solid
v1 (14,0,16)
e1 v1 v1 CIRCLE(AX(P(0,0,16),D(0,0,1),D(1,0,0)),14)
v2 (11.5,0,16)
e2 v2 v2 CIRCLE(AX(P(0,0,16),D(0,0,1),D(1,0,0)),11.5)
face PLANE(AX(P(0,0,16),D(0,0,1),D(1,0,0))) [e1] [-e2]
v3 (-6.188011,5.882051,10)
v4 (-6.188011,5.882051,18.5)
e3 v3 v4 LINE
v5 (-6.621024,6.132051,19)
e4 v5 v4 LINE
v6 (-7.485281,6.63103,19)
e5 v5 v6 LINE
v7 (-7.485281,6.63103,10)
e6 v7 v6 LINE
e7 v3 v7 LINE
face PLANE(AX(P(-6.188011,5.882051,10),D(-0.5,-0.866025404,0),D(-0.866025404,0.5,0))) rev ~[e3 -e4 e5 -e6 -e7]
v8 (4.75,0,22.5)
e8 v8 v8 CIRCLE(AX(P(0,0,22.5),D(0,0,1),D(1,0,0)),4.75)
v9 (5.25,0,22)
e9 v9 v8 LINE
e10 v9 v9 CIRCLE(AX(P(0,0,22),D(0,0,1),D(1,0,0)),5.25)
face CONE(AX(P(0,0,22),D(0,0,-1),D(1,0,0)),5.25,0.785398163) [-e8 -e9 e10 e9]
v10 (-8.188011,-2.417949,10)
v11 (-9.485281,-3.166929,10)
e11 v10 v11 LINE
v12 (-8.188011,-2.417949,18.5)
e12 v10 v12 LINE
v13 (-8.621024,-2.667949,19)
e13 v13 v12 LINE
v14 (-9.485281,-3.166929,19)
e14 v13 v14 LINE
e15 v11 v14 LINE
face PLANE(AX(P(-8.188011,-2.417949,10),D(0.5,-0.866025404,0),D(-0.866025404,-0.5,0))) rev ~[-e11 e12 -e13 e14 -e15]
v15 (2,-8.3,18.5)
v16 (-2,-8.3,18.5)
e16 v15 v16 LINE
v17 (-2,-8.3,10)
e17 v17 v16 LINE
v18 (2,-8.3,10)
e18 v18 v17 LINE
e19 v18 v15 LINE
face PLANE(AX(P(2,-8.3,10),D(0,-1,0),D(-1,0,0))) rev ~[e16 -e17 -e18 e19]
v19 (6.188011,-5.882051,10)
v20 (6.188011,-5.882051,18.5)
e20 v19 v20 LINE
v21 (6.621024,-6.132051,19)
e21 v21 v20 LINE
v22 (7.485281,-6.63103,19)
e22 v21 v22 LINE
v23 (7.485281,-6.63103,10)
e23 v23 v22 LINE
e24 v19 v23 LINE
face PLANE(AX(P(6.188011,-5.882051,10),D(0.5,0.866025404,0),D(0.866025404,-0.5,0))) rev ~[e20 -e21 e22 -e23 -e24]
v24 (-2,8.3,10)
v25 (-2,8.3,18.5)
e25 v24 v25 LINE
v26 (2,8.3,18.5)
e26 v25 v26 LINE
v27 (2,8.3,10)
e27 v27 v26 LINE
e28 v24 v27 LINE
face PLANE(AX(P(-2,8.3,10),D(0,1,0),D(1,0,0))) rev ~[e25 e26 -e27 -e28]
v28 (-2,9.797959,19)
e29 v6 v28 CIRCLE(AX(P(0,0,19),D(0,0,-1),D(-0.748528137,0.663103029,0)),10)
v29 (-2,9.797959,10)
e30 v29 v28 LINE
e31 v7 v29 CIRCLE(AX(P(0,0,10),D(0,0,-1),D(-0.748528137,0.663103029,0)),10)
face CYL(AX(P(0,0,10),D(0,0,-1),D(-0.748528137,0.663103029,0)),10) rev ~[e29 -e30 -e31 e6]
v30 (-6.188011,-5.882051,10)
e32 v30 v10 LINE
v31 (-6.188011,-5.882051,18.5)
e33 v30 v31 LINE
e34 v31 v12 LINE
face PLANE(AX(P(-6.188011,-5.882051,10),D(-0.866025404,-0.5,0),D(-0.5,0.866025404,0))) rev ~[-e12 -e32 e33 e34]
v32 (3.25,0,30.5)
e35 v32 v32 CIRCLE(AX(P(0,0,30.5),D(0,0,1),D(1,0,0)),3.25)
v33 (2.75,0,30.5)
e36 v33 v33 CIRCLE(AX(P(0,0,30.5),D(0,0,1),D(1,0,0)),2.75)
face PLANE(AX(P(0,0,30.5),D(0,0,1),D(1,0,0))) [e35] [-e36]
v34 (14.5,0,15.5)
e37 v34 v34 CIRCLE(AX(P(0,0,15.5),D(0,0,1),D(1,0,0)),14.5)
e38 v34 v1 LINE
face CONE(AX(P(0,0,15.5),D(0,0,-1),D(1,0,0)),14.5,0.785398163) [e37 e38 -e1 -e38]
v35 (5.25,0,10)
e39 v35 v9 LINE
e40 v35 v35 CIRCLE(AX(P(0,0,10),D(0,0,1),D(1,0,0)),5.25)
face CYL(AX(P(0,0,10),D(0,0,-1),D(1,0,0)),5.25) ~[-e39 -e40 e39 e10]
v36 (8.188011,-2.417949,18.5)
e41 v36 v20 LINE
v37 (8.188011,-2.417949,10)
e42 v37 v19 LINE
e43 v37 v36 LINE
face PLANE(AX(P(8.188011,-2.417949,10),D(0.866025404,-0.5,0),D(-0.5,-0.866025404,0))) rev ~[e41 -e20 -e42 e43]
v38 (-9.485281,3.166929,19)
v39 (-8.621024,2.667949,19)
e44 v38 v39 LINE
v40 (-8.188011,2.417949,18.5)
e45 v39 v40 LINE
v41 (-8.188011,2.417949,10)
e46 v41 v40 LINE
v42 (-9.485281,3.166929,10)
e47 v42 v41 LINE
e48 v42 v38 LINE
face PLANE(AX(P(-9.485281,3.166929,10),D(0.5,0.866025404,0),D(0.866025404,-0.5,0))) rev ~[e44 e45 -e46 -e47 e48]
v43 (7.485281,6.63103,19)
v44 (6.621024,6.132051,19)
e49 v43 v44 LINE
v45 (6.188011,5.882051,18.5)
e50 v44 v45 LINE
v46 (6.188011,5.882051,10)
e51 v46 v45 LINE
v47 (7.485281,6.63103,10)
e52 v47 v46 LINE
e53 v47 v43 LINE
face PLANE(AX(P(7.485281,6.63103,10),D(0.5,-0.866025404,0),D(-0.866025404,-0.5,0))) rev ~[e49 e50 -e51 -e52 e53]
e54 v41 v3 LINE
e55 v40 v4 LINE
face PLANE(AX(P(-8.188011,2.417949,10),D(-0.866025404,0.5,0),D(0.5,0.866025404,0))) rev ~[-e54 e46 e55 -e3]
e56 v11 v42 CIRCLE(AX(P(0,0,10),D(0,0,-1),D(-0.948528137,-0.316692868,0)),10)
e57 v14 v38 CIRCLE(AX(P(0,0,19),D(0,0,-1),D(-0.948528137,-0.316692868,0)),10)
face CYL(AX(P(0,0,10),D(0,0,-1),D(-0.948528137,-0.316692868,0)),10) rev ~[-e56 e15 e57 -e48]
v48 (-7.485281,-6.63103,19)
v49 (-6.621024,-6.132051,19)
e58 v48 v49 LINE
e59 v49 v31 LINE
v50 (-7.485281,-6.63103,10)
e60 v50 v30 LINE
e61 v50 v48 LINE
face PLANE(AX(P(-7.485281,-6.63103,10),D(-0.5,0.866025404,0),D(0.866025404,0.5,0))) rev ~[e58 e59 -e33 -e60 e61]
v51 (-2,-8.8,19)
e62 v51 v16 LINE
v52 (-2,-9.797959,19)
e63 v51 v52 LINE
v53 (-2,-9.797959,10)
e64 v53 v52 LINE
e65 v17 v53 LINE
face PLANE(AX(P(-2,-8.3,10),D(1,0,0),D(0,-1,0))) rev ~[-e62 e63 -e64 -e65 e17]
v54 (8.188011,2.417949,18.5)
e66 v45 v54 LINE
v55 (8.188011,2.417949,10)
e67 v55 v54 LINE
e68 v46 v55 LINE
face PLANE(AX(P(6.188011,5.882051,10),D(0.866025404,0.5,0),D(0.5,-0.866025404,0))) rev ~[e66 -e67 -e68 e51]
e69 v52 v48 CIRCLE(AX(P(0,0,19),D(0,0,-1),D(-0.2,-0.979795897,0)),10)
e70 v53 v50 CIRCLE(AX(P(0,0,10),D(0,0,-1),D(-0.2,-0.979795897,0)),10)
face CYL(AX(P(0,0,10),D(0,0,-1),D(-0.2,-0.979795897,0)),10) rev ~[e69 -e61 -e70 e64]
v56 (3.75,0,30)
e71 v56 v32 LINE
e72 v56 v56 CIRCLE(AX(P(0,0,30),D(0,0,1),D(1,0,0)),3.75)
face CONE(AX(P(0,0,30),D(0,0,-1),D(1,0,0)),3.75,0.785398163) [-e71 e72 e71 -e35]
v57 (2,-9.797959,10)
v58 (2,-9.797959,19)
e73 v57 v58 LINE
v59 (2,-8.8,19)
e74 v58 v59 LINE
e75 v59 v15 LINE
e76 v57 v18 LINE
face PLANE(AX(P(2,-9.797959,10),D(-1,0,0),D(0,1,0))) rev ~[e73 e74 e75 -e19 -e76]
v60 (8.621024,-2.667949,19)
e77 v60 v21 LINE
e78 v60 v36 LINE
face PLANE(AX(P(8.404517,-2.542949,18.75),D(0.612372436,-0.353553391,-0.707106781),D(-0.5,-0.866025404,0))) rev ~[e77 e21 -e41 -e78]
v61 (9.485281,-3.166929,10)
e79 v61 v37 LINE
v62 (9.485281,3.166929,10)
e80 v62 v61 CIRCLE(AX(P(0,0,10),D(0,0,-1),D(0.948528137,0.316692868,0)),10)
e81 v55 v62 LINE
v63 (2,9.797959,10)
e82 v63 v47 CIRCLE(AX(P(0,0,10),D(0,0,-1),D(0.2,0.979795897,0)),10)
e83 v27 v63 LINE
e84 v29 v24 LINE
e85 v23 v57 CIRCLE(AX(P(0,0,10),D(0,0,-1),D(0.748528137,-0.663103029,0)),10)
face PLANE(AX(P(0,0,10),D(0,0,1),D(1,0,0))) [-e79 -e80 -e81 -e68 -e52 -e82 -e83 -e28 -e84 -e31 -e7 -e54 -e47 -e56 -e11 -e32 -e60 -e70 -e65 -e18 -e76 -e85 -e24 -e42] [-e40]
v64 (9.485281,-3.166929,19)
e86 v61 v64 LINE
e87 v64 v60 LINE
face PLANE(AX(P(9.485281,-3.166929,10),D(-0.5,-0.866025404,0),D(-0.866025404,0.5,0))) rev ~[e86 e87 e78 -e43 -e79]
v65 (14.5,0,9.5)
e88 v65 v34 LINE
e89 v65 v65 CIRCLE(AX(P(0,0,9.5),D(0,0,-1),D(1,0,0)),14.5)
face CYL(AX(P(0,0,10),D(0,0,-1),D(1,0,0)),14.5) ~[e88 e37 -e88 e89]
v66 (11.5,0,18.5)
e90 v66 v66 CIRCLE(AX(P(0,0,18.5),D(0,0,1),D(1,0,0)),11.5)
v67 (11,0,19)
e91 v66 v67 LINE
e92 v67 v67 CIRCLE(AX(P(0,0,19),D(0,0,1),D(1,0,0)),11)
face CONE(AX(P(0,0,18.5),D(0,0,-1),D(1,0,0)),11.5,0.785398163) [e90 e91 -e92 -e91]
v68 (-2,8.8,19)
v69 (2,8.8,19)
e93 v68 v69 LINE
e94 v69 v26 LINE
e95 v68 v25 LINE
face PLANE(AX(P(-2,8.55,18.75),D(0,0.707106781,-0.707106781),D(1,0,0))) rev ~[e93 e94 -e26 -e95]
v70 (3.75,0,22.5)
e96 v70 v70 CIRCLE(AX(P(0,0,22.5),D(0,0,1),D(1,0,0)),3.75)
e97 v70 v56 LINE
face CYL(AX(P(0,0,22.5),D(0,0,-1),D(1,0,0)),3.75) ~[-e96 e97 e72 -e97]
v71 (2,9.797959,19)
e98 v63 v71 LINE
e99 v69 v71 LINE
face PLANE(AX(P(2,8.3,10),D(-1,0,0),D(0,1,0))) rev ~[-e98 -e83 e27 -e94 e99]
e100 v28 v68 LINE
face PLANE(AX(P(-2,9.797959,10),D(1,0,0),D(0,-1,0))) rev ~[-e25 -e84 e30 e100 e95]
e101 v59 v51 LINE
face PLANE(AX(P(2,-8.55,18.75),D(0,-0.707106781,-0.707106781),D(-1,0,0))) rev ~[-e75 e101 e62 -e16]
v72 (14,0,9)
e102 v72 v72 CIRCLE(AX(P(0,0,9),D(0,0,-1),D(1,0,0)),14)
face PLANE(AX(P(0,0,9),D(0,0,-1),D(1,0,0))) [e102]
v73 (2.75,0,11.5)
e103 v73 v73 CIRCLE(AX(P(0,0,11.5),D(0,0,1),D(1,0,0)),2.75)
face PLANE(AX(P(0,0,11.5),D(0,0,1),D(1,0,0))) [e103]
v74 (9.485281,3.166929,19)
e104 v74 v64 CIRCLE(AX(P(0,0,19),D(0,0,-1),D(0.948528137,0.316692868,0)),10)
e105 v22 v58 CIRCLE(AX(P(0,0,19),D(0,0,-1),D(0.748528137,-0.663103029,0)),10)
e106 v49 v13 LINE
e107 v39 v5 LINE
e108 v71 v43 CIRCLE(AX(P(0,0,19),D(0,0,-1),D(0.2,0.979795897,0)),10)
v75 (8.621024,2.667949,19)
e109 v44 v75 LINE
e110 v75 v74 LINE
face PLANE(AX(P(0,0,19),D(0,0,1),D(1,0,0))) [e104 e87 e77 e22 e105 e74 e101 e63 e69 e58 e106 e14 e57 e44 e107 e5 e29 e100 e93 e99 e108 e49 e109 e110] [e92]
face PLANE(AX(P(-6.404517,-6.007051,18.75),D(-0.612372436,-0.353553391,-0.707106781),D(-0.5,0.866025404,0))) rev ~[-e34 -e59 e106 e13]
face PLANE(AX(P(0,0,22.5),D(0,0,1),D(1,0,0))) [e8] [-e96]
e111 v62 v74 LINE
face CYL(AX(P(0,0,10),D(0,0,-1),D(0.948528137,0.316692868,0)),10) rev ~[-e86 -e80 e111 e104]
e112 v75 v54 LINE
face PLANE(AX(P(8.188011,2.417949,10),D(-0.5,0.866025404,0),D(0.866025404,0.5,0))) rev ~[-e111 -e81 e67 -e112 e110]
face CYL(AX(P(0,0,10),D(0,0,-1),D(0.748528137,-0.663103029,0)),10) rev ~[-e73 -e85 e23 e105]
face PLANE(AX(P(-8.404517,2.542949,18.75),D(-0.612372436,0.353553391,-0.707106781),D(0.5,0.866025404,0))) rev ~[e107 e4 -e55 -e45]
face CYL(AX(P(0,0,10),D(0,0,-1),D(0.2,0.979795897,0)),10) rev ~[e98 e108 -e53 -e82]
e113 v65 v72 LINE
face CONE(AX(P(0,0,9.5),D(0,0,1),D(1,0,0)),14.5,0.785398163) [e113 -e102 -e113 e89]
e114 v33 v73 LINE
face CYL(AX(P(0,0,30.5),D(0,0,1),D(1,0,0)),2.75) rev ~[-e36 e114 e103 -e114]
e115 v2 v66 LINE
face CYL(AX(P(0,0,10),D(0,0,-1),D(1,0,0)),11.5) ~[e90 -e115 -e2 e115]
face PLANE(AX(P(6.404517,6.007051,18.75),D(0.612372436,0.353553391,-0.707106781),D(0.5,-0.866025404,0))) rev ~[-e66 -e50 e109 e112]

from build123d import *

# Parameters (mm, degrees)
F0_R      = 14.5
F1_DEPTH  = 10
F2_R      = 11.5
F3_DEPTH  = 9
F4_SIZE   = 0.5
F5_R      = 5.25
F6_DEPTH  = 12.5
F7_SIZE   = 0.5
F8_R      = 3.75
F9_DEPTH  = 8
F10_SIZE  = 0.5
F11_R     = 14.5
F11_R_2   = 11.5
F12_DEPTH = 6
F13_R     = 25
F14_DEPTH = 9
F15_SIZE  = 0.5
F16_R     = 2.75
F17_DEPTH = 19


with BuildPart() as f1:
    # F0 (on Top) → F1 (new body)
    with BuildSketch(Plane.XY):
        Circle(F0_R)
    extrude(amount=F1_DEPTH)

    # F2 (on face) → F3 (join)
    with BuildSketch(Plane.XY.offset(10)):
        Circle(F2_R)
        with BuildLine():
            ThreePointArc((-7.4852813742, 6.6310302931), (-5, 8.6602540378), (-2, 9.7979589711))
            Line((-2, 9.7979589711), (-2, 8.3))
            Line((-2, 8.3), (2, 8.3))
            Line((2, 8.3), (2, 9.7979589711))
            ThreePointArc((2, 9.7979589711), (5, 8.6602540378), (7.4852813742, 6.6310302931))
            Line((7.4852813742, 6.6310302931), (6.1880108514, 5.8820508076))
            Line((6.1880108514, 5.8820508076), (8.1880108514, 2.4179491924))
            Line((8.1880108514, 2.4179491924), (9.4852813742, 3.166928678))
            ThreePointArc((9.4852813742, 3.166928678), (10, 0), (9.4852813742, -3.166928678))
            Line((9.4852813742, -3.166928678), (8.1880108514, -2.4179491924))
            Line((8.1880108514, -2.4179491924), (6.1880108514, -5.8820508076))
            Line((6.1880108514, -5.8820508076), (7.4852813742, -6.6310302931))
            ThreePointArc((7.4852813742, -6.6310302931), (5, -8.6602540378), (2, -9.7979589711))
            Line((2, -9.7979589711), (2, -8.3))
            Line((2, -8.3), (-2, -8.3))
            Line((-2, -8.3), (-2, -9.7979589711))
            ThreePointArc((-2, -9.7979589711), (-5, -8.6602540378), (-7.4852813742, -6.6310302931))
            Line((-7.4852813742, -6.6310302931), (-6.1880108514, -5.8820508076))
            Line((-6.1880108514, -5.8820508076), (-8.1880108514, -2.4179491924))
            Line((-8.1880108514, -2.4179491924), (-9.4852813742, -3.166928678))
            ThreePointArc((-9.4852813742, -3.166928678), (-10, 0), (-9.4852813742, 3.166928678))
            Line((-9.4852813742, 3.166928678), (-8.1880108514, 2.4179491924))
            Line((-8.1880108514, 2.4179491924), (-6.1880108514, 5.8820508076))
            Line((-6.1880108514, 5.8820508076), (-7.4852813742, 6.6310302931))
        make_face(mode=Mode.SUBTRACT)
    extrude(amount=F3_DEPTH)

    # F4
    f4_edges = [f1.edges().sort_by_distance(p)[0] for p in [
        (0, 8.3, 19),
        (-7.188011, 4.15, 19),
        (-7.188011, -4.15, 19),
        (0, -8.3, 19),
        (7.188011, -4.15, 19),
        (7.188011, 4.15, 19),
    ]]
    chamfer(f4_edges, length=F4_SIZE)

    # F5 (on face) → F6 (join)
    with BuildSketch(Plane.XY.offset(10)):
        Circle(F5_R)
    extrude(amount=F6_DEPTH)

    # F7
    f7_edges = [f1.edges().sort_by_distance(p)[0] for p in [
        (-5.25, 0, 22.5),
    ]]
    chamfer(f7_edges, length=F7_SIZE)

    # F8 (on face) → F9 (join)
    with BuildSketch(Plane.XY.offset(22.5)):
        Circle(F8_R)
    extrude(amount=F9_DEPTH)

    # F10
    f10_edges = [f1.edges().sort_by_distance(p)[0] for p in [
        (-3.75, 0, 30.5),
    ]]
    chamfer(f10_edges, length=F10_SIZE)

    # F11 (on face) → F12 (join)
    with BuildSketch(Plane.XY.offset(10)):
        Circle(F11_R)
        Circle(F11_R_2, mode=Mode.SUBTRACT)
    extrude(amount=F12_DEPTH)

    # F13 (on face) → F14 (cut)
    with BuildSketch(Plane(origin=(0, 0, 0), x_dir=(1, 0, 0), z_dir=(0, 0, -1))):
        Circle(F13_R)
    extrude(amount=-F14_DEPTH, mode=Mode.SUBTRACT)

    # F15
    f15_edges = [f1.edges().sort_by_distance(p)[0] for p in [
        (-11.5, 0, 19),
        (-14.5, 0, 16),
        (-14.5, 0, 9),
    ]]
    chamfer(f15_edges, length=F15_SIZE)

    # F16 (on face) → F17 (cut)
    with BuildSketch(Plane.XY.offset(30.5)):
        Circle(F16_R)
    extrude(amount=-F17_DEPTH, mode=Mode.SUBTRACT)


solid = f1.part
